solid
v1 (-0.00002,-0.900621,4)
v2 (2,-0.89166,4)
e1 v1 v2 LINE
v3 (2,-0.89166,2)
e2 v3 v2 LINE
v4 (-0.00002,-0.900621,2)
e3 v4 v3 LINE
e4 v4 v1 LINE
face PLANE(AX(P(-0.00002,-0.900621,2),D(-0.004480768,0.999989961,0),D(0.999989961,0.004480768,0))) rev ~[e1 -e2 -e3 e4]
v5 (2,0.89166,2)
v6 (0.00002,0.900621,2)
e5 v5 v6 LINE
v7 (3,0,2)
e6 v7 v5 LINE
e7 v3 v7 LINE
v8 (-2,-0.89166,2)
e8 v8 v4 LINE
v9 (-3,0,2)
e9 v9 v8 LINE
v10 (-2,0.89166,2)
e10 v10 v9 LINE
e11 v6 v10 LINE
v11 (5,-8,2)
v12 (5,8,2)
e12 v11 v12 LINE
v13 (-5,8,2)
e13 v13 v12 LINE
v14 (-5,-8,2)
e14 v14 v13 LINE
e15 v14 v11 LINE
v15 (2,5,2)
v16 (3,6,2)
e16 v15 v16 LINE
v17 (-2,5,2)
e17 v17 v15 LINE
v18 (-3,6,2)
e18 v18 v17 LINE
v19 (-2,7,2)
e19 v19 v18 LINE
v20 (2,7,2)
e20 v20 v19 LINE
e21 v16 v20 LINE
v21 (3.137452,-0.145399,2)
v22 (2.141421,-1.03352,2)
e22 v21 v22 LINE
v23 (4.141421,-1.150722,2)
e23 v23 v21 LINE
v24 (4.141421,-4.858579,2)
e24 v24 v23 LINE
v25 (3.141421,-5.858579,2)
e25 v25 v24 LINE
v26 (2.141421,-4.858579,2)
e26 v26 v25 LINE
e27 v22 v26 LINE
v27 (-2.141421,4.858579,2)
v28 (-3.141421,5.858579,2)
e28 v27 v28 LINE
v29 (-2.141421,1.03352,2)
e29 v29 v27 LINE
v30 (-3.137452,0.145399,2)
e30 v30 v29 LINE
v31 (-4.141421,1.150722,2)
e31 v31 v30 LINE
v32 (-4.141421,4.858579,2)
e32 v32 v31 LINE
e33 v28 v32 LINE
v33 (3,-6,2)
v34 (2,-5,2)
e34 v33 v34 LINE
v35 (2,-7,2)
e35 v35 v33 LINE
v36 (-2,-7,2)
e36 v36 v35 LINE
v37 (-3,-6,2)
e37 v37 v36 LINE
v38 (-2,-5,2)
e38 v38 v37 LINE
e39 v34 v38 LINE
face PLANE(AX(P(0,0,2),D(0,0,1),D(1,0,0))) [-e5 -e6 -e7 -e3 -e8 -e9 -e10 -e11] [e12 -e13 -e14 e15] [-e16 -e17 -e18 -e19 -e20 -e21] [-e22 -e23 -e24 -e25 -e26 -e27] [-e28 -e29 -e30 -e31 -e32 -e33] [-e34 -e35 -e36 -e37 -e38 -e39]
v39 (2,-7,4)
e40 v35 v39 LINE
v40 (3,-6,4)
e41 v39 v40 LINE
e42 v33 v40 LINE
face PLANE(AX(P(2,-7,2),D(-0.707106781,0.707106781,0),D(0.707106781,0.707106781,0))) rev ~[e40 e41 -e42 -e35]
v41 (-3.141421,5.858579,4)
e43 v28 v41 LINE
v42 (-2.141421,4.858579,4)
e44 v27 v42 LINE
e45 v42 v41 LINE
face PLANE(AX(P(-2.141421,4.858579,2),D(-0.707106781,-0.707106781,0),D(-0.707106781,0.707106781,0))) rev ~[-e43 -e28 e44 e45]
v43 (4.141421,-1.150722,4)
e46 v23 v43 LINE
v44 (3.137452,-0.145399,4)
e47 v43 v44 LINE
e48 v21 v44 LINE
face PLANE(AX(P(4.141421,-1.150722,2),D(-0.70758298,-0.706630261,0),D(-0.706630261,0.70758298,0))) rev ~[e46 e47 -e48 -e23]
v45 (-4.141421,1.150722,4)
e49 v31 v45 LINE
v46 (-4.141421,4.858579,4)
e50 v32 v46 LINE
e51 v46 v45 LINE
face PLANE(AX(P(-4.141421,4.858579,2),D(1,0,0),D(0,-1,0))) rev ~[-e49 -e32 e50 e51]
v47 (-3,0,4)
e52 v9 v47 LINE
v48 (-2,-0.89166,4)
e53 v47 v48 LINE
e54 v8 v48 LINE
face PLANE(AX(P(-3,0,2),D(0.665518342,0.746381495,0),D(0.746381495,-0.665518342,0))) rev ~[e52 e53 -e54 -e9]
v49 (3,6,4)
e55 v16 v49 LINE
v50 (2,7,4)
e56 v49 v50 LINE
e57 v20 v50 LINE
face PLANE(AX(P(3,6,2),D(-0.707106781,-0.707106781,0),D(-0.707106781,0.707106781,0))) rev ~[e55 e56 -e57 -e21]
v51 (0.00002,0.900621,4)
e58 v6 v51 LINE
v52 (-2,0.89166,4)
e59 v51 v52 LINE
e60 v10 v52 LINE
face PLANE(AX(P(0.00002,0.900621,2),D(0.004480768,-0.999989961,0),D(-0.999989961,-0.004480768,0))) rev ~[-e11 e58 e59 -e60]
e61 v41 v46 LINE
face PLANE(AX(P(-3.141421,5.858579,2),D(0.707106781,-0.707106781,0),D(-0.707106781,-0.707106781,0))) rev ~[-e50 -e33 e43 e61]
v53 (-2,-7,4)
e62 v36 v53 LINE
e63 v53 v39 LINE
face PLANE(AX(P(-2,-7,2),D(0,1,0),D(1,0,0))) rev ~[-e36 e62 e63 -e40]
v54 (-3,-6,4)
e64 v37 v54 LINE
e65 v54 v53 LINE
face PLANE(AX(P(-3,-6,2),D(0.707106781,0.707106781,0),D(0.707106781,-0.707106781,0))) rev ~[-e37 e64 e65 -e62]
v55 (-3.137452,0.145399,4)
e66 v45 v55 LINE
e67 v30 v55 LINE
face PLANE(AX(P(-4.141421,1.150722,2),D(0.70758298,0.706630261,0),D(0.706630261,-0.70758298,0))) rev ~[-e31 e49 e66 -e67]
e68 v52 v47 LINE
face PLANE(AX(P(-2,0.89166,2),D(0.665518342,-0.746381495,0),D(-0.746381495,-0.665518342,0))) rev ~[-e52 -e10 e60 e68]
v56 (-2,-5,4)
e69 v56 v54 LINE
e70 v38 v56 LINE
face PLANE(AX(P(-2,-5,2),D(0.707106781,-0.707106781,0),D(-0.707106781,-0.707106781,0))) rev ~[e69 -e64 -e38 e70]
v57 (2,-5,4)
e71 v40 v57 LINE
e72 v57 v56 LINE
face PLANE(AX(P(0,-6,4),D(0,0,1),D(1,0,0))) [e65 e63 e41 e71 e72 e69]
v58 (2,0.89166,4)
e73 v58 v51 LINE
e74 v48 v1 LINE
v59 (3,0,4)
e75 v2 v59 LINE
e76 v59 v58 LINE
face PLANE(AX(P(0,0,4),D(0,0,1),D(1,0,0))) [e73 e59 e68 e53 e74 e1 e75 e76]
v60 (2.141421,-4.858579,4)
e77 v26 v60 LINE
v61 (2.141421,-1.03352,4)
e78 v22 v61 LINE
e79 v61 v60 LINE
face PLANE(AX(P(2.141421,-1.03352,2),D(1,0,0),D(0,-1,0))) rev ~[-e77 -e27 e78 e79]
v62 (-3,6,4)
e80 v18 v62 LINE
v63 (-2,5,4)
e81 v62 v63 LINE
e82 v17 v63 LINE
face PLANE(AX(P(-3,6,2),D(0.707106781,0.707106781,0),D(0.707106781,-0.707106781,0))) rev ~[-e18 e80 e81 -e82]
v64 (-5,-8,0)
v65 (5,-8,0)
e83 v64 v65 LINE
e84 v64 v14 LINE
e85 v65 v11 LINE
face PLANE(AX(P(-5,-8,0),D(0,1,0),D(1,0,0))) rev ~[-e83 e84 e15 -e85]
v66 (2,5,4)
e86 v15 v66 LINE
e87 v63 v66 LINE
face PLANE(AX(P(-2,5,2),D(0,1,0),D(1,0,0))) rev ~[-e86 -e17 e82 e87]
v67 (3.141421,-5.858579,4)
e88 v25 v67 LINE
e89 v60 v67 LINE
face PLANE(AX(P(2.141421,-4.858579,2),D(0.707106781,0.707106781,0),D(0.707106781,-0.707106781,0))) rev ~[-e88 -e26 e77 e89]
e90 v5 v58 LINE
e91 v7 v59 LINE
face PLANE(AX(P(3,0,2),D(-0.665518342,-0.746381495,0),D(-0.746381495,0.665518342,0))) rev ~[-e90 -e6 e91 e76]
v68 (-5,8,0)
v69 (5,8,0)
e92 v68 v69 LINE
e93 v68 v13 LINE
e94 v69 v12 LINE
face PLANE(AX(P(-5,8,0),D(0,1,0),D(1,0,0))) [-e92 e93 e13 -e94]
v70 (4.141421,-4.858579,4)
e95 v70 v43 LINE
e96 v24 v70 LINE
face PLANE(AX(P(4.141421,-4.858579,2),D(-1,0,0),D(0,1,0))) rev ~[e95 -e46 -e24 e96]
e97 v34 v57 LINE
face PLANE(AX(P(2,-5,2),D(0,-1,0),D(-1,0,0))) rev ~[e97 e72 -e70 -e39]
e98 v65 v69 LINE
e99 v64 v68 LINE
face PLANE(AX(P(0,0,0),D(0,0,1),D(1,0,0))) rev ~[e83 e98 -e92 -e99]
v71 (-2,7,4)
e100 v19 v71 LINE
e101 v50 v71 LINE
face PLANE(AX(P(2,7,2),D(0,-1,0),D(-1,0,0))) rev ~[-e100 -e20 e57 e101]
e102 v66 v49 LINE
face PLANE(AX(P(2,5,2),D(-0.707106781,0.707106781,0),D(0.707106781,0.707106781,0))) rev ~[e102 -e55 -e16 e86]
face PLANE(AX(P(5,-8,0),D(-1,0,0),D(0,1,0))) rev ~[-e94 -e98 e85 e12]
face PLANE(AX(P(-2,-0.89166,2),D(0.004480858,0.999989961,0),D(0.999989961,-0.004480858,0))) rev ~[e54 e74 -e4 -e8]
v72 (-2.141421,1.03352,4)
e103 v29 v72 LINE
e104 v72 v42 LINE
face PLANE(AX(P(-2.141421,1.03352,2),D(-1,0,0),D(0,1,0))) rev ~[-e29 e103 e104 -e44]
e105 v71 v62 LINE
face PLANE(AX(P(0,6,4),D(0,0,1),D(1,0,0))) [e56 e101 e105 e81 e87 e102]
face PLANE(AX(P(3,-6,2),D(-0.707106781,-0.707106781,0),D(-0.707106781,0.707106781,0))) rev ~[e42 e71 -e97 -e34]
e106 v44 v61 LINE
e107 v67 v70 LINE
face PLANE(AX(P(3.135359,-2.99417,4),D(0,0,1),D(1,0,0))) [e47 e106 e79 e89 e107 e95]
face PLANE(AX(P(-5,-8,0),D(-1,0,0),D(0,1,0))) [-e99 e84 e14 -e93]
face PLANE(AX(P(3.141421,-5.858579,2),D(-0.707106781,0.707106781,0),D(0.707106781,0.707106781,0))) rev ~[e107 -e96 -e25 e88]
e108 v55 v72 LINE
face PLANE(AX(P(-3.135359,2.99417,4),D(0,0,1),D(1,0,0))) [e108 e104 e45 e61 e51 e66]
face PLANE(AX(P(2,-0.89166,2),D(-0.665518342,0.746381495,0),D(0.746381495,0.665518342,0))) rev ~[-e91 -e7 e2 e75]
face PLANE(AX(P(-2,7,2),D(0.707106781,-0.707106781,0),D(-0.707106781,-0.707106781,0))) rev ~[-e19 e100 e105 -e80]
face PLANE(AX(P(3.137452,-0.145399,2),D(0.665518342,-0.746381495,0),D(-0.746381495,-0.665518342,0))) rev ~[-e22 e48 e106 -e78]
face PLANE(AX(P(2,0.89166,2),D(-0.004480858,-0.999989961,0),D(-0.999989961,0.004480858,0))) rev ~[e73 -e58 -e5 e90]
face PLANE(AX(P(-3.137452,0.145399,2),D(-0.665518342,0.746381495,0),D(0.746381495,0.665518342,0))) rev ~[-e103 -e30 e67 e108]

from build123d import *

# Parameters (mm, degrees)
F0_W     = 10
F0_H     = 16
F1_DEPTH = 2
F3_DEPTH = 2


# Not quite as in the source:
# - ends of sketch curves that miss each other by under 0.0002 mm in the source are joined


with BuildPart() as f1:
    # F0 (on Top) → F1 (new body)
    with BuildSketch(Plane.XY):
        Rectangle(F0_W, F0_H)
    extrude(amount=F1_DEPTH)

    # F2 (on face) → F3 (join)
    with BuildSketch(Plane.XY.offset(2)):
        Polygon((0, 7), (-2, 7), (-3, 6), (-2, 5), (0, 5), (2, 5), (3, 6), (2, 7), align=None)
        Polygon((-2.1414213562, 4.8585786438), (-3.1414213562, 5.8585786438), (-4.1414213562, 4.8585786438), (-4.1414213562, 1.1507223826), (-3.1374518146, 0.1453992321), (-2.1414213562, 1.0335195075), align=None)
        Polygon((2, 0.891659756), (2.00782e-05, 0.9006214721), (-2, 0.891659756), (-3, 0), (-2, -0.891659756), (-2.00782e-05, -0.9006214721), (2, -0.891659756), (3, 0), align=None)
        Polygon((0, -5), (-2, -5), (-3, -6), (-2, -7), (0, -7), (2, -7), (3, -6), (2, -5), align=None)
        Polygon((3.1374518146, -0.1453992321), (2.1414213562, -1.0335195075), (2.1414213562, -4.8585786438), (3.1414213562, -5.8585786438), (4.1414213562, -4.8585786438), (4.1414213562, -1.1507223826), align=None)
    extrude(amount=F3_DEPTH)


solid = f1.part
